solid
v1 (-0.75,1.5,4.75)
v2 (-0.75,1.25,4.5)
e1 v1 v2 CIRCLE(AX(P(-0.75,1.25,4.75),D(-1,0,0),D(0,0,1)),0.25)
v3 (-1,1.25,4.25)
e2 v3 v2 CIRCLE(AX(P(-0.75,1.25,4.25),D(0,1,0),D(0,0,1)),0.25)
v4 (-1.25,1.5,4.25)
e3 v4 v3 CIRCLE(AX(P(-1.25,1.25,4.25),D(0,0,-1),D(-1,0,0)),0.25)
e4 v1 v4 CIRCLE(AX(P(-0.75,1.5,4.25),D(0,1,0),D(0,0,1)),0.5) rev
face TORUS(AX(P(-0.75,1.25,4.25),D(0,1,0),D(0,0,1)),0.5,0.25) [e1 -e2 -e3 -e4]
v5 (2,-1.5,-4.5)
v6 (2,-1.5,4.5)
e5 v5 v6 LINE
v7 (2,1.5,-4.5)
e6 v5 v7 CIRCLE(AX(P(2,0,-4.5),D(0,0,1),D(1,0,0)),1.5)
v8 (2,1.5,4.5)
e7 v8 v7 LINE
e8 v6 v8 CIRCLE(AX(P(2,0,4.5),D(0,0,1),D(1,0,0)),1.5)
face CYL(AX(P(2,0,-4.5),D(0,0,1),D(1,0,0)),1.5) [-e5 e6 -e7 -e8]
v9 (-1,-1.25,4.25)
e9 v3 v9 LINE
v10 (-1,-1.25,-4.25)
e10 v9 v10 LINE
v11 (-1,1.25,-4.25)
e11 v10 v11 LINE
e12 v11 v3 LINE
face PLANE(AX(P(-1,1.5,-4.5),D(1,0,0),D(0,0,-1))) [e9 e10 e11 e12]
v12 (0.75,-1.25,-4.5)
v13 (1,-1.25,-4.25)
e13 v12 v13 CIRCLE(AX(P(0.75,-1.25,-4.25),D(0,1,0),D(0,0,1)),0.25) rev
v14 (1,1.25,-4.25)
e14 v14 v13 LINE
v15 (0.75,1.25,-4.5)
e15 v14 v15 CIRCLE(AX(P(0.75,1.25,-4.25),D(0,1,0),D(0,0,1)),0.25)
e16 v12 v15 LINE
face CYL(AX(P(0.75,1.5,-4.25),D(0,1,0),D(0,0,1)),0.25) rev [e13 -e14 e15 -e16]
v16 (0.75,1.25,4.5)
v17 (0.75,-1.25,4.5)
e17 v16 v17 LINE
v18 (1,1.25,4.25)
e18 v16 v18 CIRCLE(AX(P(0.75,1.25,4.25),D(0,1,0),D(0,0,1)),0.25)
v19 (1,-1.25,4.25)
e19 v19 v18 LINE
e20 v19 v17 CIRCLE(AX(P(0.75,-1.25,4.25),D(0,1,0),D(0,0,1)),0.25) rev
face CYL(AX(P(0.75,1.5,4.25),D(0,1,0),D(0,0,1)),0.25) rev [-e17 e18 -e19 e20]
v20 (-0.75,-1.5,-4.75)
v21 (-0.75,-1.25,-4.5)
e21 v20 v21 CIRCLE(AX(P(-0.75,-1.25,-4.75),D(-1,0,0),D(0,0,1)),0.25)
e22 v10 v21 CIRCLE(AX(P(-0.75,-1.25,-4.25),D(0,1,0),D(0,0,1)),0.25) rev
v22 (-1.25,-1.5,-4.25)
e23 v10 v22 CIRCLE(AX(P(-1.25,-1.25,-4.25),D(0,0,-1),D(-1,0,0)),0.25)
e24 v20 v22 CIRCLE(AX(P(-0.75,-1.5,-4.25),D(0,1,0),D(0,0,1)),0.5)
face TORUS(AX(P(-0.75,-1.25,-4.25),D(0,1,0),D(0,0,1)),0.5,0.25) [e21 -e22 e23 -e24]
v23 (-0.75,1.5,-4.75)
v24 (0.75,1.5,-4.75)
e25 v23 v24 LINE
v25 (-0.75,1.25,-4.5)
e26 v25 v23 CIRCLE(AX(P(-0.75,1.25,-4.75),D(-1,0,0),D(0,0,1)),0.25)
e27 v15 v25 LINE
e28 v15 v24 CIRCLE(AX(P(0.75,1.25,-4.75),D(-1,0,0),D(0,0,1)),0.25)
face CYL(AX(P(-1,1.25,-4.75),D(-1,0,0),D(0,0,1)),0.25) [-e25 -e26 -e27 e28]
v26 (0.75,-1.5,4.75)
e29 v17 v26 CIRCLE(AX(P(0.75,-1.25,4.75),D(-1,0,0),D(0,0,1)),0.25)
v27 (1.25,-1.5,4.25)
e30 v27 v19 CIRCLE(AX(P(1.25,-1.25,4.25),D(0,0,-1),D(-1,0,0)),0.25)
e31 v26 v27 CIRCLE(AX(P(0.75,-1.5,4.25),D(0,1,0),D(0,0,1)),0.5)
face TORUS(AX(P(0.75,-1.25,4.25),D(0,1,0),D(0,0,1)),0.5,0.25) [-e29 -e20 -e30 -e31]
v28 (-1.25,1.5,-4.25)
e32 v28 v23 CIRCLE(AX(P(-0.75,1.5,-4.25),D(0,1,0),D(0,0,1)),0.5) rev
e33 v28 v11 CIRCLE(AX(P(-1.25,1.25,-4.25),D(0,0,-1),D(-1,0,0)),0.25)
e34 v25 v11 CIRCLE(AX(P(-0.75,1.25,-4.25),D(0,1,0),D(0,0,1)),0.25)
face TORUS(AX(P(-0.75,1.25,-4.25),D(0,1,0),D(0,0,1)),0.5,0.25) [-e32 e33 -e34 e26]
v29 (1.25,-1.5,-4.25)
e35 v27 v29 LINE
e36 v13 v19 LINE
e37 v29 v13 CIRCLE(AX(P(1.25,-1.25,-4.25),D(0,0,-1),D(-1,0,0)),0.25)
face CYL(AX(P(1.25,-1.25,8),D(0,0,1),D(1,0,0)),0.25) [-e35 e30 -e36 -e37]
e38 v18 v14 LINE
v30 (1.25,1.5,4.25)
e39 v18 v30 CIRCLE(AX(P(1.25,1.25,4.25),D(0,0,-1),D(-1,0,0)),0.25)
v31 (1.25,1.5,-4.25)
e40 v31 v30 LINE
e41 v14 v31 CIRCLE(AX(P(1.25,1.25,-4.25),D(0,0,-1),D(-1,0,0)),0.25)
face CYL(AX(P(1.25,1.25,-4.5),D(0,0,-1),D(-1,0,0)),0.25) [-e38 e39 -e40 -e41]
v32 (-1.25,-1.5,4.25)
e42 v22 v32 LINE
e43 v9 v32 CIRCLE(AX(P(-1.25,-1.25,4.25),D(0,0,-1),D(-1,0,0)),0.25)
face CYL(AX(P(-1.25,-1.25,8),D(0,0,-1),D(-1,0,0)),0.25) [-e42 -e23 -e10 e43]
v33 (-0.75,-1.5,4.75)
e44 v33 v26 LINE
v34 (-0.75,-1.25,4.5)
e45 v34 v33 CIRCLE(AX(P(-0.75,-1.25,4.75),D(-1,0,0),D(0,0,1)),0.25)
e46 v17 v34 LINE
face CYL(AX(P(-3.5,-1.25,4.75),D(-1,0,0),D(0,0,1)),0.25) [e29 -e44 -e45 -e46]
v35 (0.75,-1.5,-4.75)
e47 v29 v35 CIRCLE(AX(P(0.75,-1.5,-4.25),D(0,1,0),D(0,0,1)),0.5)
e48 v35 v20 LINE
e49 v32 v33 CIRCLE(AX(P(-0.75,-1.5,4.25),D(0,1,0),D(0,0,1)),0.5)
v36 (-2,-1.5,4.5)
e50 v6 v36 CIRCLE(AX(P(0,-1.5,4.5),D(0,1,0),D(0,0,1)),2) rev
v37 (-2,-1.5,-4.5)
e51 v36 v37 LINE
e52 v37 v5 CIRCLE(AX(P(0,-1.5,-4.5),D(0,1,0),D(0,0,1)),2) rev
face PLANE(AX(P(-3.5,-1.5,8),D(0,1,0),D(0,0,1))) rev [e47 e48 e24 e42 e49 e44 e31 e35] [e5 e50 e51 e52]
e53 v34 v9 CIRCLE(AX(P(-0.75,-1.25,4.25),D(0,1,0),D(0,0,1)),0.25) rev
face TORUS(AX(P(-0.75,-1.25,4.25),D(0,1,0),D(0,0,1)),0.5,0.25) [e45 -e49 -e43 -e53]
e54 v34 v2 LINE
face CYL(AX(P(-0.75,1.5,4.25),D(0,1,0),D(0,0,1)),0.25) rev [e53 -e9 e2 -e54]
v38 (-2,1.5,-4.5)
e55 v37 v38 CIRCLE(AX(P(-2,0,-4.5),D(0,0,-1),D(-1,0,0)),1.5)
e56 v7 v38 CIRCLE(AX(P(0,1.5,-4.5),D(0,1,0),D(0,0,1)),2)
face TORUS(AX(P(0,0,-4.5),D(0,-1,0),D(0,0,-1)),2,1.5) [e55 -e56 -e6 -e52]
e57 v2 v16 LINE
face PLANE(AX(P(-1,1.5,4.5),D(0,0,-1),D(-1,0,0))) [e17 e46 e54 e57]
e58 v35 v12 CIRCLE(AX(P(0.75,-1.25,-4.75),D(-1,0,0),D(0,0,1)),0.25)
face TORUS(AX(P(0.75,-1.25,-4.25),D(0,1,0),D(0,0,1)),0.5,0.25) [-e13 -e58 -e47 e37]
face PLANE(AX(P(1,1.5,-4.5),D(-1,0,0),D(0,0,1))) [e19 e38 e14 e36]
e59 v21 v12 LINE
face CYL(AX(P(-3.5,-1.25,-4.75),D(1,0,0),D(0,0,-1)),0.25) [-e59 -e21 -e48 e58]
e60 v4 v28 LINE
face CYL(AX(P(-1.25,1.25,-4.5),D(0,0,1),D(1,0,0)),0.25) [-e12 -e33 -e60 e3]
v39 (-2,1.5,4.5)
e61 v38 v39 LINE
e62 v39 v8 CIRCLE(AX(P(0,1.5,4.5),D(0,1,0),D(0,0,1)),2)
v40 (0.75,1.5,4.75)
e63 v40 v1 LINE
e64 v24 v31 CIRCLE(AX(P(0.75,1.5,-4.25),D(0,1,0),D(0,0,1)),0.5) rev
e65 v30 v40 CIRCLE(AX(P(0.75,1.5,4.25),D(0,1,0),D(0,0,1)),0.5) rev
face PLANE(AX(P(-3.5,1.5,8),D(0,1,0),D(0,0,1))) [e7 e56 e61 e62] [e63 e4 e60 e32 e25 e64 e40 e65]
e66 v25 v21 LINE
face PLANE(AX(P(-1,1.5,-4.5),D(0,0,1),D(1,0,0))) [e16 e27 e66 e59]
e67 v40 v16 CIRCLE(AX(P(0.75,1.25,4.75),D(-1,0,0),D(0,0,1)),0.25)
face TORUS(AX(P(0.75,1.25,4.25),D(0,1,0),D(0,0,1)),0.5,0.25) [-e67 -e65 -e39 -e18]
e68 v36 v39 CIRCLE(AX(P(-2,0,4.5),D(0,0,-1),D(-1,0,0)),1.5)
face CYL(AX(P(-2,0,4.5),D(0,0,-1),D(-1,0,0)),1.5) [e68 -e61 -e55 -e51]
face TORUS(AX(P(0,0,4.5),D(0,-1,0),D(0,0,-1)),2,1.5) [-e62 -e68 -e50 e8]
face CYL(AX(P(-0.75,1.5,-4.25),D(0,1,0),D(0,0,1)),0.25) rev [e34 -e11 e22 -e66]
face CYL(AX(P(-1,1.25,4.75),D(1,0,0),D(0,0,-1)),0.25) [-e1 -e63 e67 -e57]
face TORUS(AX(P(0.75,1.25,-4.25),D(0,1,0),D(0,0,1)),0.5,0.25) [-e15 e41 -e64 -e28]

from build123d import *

# Parameters (mm, degrees)
SKETCH1_W      = 7
SKETCH1_H      = 16
SKETCH1_W_2    = 2
SKETCH1_H_2    = 9
EXTRUDE1_DEPTH = 1.5
FILLET1_RADIUS = 3.5
FILLET1_LENGTH = 3
FILLET5_RADIUS = 3.5
FILLET5_LENGTH = 3
FILLET3_R      = 0.25
FILLET4_R      = 0.25
FILLET6_R      = 1.5


with BuildPart() as part:
    # Sketch1 → Extrude1 (new, symmetric)
    with BuildSketch(Plane(origin=(0, 0, 0), x_dir=(1, 0, 0), z_dir=(0, 1, 0))):
        Rectangle(SKETCH1_W, SKETCH1_H)
        Rectangle(SKETCH1_W_2, SKETCH1_H_2, mode=Mode.SUBTRACT)
    extrude(amount=EXTRUDE1_DEPTH, both=True)

    # Fillet1: full round fillet: the end face becomes a half cylinder, R = half its width
    fillet1_face = Plane((0, 0, 8), x_dir=(0, 1, 0), z_dir=(0, 0, 1))  # on the end face: x along it, z out of the body
    fillet1_slab = fillet1_face.offset(-FILLET1_RADIUS / 2) * Box(FILLET1_LENGTH, 2 * FILLET1_RADIUS, FILLET1_RADIUS, mode=Mode.PRIVATE)  # the body's end, R deep
    fillet1_round = Plane((0, 0, 4.5), x_dir=(0, 0, 1), z_dir=(0, 1, 0)) * Cylinder(FILLET1_RADIUS, FILLET1_LENGTH, mode=Mode.PRIVATE)  # its axis R under the face
    add(fillet1_slab - fillet1_round, mode=Mode.SUBTRACT)

    # Fillet5: full round fillet: the end face becomes a half cylinder, R = half its width
    fillet5_face = Plane((0, 0, -8), x_dir=(0, 1, 0), z_dir=(0, 0, -1))  # on the end face: x along it, z out of the body
    fillet5_slab = fillet5_face.offset(-FILLET5_RADIUS / 2) * Box(FILLET5_LENGTH, 2 * FILLET5_RADIUS, FILLET5_RADIUS, mode=Mode.PRIVATE)  # the body's end, R deep
    fillet5_round = Plane((0, 0, -4.5), x_dir=(0, 0, -1), z_dir=(0, 1, 0)) * Cylinder(FILLET5_RADIUS, FILLET5_LENGTH, mode=Mode.PRIVATE)  # its axis R under the face
    add(fillet5_slab - fillet5_round, mode=Mode.SUBTRACT)

    # Fillet3
    fillet3_edges = [part.edges().sort_by_distance(p)[0] for p in [
        (-1, 0, -4.5),
        (-1, 0, 4.5),
        (1, 0, 4.5),
        (1, 0, -4.5),
    ]]
    fillet(fillet3_edges, radius=FILLET3_R)

    # Fillet4
    fillet4_edges = [part.edges().sort_by_distance(p)[0] for p in [
        (1, -1.5, 0),
        (1, 1.5, 0),
        (0, -1.5, -4.5),
        (0, 1.5, -4.5),
        (-1, -1.5, 0),
        (-1, 1.5, 0),
        (0, -1.5, 4.5),
        (0, 1.5, 4.5),
        (0.926776695, -1.5, -4.426776695),
        (0.926776695, 1.5, -4.426776695),
        (-0.926776695, -1.5, -4.426776695),
        (-0.926776695, 1.5, -4.426776695),
        (0.926776695, -1.5, 4.426776695),
        (0.926776695, 1.5, 4.426776695),
        (-0.926776695, -1.5, 4.426776695),
        (-0.926776695, 1.5, 4.426776695),
    ]]
    fillet(fillet4_edges, radius=FILLET4_R)

    # Fillet6
    fillet6_edges = [part.edges().sort_by_distance(p)[0] for p in [
        (3.5, -1.5, 0),
        (3.5, 1.5, 0),
        (0, 1.5, 8),
        (-3.5, -1.5, 0),
        (-3.5, 1.5, 0),
        (0, -1.5, -8),
    ]]
    fillet(fillet6_edges, radius=FILLET6_R - 0.0001)  # a hair under: the kernel refuses the full size


solid = part.part
